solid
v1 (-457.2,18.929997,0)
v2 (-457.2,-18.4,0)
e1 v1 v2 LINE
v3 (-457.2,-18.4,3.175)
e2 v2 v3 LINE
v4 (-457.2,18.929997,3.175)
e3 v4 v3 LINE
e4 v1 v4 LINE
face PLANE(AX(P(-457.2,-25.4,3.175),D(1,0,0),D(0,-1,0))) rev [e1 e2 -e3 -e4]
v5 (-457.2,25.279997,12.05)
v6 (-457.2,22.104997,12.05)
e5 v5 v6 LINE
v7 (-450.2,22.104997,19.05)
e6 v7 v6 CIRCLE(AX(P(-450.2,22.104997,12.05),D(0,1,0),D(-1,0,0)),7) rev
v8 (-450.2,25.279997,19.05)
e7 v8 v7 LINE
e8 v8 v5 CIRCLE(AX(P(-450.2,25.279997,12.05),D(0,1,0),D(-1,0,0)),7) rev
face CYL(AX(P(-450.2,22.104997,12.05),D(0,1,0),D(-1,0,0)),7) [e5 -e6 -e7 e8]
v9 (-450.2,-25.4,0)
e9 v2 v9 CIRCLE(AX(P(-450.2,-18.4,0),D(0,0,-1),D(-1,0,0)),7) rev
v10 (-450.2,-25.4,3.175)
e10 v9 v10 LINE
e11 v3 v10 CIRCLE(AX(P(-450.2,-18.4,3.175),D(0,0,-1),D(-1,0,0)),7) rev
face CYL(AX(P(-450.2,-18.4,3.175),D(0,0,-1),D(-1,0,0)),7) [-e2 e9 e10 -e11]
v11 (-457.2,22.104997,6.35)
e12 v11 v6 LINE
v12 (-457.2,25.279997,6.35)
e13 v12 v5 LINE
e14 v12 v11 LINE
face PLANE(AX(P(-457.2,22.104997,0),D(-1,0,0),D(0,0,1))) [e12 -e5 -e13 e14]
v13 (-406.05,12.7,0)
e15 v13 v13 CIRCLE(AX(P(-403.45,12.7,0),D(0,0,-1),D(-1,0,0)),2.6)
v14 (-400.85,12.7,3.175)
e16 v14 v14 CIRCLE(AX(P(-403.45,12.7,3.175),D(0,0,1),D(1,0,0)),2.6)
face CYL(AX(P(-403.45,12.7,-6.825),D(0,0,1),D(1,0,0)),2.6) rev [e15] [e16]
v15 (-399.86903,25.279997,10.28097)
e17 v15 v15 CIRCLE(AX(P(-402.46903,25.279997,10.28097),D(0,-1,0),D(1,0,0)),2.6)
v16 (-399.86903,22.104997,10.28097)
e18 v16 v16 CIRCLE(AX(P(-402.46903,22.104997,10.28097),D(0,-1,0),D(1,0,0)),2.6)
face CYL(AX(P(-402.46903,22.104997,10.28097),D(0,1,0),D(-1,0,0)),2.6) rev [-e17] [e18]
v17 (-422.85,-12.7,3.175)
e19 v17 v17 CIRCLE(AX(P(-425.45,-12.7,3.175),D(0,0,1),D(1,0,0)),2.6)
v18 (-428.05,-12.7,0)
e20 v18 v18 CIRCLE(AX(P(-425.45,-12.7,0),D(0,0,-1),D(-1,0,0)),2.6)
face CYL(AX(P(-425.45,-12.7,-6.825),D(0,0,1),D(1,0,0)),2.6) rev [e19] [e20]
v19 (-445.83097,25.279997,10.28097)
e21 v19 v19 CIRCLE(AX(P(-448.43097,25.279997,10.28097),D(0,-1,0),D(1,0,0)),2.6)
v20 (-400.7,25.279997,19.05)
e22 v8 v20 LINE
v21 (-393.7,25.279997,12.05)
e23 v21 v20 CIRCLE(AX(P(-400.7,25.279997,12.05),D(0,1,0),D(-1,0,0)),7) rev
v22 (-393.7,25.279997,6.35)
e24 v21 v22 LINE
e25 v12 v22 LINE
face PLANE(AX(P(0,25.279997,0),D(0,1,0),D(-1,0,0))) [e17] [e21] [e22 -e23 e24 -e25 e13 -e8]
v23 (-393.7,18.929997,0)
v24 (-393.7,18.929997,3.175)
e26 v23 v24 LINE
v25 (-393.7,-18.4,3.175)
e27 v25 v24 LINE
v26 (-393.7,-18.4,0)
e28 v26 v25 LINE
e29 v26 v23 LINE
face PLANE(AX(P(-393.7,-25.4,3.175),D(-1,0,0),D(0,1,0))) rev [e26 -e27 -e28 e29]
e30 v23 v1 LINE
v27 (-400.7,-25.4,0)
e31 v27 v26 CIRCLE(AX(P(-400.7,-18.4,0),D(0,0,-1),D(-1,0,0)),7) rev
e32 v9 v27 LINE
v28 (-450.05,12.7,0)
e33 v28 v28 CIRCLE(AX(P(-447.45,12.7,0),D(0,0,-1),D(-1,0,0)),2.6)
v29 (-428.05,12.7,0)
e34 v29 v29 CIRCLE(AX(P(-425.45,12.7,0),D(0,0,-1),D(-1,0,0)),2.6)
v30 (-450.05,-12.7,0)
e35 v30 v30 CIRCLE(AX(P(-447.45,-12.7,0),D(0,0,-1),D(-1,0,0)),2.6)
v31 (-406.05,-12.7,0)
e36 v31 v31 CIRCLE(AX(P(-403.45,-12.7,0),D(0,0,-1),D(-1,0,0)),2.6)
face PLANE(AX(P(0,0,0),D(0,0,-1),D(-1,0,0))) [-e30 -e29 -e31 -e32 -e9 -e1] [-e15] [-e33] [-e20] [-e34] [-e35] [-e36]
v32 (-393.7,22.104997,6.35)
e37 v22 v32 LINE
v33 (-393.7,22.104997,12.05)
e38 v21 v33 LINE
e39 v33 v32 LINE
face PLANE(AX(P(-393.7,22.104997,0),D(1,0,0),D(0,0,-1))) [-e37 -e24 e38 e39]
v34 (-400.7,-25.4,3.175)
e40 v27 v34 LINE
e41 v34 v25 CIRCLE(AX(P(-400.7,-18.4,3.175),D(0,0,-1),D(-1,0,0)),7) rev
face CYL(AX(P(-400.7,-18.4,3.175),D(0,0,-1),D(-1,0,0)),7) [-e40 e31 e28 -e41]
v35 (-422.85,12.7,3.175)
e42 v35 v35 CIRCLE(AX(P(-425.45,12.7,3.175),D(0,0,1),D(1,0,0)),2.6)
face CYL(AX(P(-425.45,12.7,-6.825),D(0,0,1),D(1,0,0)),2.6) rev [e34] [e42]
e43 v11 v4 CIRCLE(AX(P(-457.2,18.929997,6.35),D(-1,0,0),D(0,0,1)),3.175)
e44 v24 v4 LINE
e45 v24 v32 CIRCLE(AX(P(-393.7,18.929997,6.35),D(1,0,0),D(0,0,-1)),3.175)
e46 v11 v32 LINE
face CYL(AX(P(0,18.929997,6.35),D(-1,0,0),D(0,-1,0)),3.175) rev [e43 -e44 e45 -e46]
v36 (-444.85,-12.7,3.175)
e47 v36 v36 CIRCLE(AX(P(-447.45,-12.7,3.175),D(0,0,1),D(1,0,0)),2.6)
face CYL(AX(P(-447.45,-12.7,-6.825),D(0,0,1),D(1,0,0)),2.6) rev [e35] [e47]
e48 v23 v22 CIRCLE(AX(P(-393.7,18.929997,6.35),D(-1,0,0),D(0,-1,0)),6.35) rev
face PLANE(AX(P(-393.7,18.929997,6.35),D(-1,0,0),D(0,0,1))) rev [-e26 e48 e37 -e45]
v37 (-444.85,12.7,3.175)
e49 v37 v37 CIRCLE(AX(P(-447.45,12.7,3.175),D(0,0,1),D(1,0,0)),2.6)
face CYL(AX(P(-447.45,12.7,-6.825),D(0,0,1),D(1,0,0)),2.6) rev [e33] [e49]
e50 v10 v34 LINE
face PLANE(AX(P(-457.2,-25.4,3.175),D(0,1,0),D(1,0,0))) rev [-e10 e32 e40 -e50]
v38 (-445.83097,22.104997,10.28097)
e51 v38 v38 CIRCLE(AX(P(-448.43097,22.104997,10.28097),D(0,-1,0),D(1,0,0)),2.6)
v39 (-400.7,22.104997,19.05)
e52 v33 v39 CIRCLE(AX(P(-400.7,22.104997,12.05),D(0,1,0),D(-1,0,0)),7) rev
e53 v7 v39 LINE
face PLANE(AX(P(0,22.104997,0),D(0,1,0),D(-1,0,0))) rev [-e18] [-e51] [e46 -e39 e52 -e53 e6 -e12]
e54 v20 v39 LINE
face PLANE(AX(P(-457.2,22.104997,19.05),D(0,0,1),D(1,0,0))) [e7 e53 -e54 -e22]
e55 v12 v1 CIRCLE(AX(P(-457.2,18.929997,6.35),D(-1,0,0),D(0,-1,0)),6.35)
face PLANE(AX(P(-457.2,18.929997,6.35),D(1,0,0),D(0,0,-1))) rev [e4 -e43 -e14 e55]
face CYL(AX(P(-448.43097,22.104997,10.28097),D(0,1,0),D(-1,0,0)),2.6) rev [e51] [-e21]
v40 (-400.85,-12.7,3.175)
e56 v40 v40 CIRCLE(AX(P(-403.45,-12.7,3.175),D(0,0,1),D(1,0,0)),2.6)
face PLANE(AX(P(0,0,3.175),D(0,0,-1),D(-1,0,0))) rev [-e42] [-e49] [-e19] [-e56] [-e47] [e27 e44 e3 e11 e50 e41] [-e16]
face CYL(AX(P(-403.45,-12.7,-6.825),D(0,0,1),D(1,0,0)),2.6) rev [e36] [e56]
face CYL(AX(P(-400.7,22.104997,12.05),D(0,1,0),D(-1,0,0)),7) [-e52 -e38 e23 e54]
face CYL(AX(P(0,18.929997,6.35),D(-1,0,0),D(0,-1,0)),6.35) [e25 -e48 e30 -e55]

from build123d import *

# Parameters (mm, degrees)
SKETCH2_W              = 63.5
SKETCH2_H              = 50.679996867
BOSS_EXTRUDE1_DEPTH    = 3.175
SKETCH3_W              = 63.5
SKETCH3_H              = 19.05
BOSS_EXTRUDE2_DEPTH    = 3.175
SKETCH4_R              = 2.6
CUT_EXTRUDE1_DEPTH     = 3.175
FILLET1_R              = 7
CONVERT_SOLID1_START   = -457.2
CONVERT_SOLID1_DEPTH   = 63.5
CONVERT_SOLID1_2_DEPTH = 63.5
SKETCH5_R              = 2.6
CUT_EXTRUDE2_DEPTH     = 10


# Read off the part's stored shape, not the designer's step: Convert-Solid1
with BuildPart() as part:
    # Sketch2 → Boss-Extrude1 (new body)
    with BuildSketch(Plane.XY):
        with Locations((-425.45, -0.060001567)):
            Rectangle(SKETCH2_W, SKETCH2_H)
    extrude(amount=BOSS_EXTRUDE1_DEPTH)

    # Sketch3 → Boss-Extrude2 (add)
    with BuildSketch(Plane(origin=(0, 25.279996867, 0), x_dir=(1, 0, 0), z_dir=(0, 1, 0))):
        with Locations((-425.45, -9.525)):
            Rectangle(SKETCH3_W, SKETCH3_H)
    extrude(amount=-BOSS_EXTRUDE2_DEPTH)

    # Sketch4 → Cut-Extrude1 (cut)
    with BuildSketch(Plane.XZ.offset(-22.104996867)):
        with Locations((-402.469029611, 10.280970389)):
            Circle(SKETCH4_R)
        with Locations((-448.430970389, 10.280970389)):
            Circle(SKETCH4_R)
    extrude(amount=-CUT_EXTRUDE1_DEPTH, mode=Mode.SUBTRACT)

    # Fillet1
    fillet1_edges = [part.edges().sort_by_distance(p)[0] for p in [
        (-457.2, 23.692496867, 19.05),
        (-393.7, 23.692496867, 19.05),
        (-393.7, -25.4, 1.5875),
        (-457.2, -25.4, 1.5875),
    ]]
    fillet(fillet1_edges, radius=FILLET1_R)

    # Convert-Solid1 outline → Convert-Solid1 (cut)
    with BuildSketch(Plane.YZ.offset(CONVERT_SOLID1_START)):
        with BuildLine():
            Line((25.279996867, 0), (25.279996867, 6.35))
            ThreePointArc((25.279996867, 6.35), (23.420124928, 1.859871939), (18.929996867, 0))
            Line((18.929996867, 0), (25.279996867, 0))
        make_face()
    extrude(amount=CONVERT_SOLID1_DEPTH, mode=Mode.SUBTRACT)

    # Convert-Solid1 2 outline → Convert-Solid1 2 (add)
    with BuildSketch(Plane.YZ.offset(CONVERT_SOLID1_START)):
        with BuildLine():
            Line((22.104996867, 3.175), (22.104996867, 6.35))
            ThreePointArc((22.104996867, 6.35), (21.175060897, 4.10493597), (18.929996867, 3.175))
            Line((18.929996867, 3.175), (22.104996867, 3.175))
        make_face()
    extrude(amount=CONVERT_SOLID1_2_DEPTH)

    # Sketch5 → Cut-Extrude2 (cut)
    with BuildSketch(Plane.XY.offset(3.175)):
        with Locations((-447.45, 12.7)):
            Circle(SKETCH5_R)
        with Locations((-425.45, 12.7)):
            Circle(SKETCH5_R)
        with Locations((-403.45, 12.7)):
            Circle(SKETCH5_R)
        with Locations((-403.45, -12.7)):
            Circle(SKETCH5_R)
        with Locations((-425.45, -12.7)):
            Circle(SKETCH5_R)
        with Locations((-447.45, -12.7)):
            Circle(SKETCH5_R)
    extrude(amount=-CUT_EXTRUDE2_DEPTH, mode=Mode.SUBTRACT)


solid = part.part
